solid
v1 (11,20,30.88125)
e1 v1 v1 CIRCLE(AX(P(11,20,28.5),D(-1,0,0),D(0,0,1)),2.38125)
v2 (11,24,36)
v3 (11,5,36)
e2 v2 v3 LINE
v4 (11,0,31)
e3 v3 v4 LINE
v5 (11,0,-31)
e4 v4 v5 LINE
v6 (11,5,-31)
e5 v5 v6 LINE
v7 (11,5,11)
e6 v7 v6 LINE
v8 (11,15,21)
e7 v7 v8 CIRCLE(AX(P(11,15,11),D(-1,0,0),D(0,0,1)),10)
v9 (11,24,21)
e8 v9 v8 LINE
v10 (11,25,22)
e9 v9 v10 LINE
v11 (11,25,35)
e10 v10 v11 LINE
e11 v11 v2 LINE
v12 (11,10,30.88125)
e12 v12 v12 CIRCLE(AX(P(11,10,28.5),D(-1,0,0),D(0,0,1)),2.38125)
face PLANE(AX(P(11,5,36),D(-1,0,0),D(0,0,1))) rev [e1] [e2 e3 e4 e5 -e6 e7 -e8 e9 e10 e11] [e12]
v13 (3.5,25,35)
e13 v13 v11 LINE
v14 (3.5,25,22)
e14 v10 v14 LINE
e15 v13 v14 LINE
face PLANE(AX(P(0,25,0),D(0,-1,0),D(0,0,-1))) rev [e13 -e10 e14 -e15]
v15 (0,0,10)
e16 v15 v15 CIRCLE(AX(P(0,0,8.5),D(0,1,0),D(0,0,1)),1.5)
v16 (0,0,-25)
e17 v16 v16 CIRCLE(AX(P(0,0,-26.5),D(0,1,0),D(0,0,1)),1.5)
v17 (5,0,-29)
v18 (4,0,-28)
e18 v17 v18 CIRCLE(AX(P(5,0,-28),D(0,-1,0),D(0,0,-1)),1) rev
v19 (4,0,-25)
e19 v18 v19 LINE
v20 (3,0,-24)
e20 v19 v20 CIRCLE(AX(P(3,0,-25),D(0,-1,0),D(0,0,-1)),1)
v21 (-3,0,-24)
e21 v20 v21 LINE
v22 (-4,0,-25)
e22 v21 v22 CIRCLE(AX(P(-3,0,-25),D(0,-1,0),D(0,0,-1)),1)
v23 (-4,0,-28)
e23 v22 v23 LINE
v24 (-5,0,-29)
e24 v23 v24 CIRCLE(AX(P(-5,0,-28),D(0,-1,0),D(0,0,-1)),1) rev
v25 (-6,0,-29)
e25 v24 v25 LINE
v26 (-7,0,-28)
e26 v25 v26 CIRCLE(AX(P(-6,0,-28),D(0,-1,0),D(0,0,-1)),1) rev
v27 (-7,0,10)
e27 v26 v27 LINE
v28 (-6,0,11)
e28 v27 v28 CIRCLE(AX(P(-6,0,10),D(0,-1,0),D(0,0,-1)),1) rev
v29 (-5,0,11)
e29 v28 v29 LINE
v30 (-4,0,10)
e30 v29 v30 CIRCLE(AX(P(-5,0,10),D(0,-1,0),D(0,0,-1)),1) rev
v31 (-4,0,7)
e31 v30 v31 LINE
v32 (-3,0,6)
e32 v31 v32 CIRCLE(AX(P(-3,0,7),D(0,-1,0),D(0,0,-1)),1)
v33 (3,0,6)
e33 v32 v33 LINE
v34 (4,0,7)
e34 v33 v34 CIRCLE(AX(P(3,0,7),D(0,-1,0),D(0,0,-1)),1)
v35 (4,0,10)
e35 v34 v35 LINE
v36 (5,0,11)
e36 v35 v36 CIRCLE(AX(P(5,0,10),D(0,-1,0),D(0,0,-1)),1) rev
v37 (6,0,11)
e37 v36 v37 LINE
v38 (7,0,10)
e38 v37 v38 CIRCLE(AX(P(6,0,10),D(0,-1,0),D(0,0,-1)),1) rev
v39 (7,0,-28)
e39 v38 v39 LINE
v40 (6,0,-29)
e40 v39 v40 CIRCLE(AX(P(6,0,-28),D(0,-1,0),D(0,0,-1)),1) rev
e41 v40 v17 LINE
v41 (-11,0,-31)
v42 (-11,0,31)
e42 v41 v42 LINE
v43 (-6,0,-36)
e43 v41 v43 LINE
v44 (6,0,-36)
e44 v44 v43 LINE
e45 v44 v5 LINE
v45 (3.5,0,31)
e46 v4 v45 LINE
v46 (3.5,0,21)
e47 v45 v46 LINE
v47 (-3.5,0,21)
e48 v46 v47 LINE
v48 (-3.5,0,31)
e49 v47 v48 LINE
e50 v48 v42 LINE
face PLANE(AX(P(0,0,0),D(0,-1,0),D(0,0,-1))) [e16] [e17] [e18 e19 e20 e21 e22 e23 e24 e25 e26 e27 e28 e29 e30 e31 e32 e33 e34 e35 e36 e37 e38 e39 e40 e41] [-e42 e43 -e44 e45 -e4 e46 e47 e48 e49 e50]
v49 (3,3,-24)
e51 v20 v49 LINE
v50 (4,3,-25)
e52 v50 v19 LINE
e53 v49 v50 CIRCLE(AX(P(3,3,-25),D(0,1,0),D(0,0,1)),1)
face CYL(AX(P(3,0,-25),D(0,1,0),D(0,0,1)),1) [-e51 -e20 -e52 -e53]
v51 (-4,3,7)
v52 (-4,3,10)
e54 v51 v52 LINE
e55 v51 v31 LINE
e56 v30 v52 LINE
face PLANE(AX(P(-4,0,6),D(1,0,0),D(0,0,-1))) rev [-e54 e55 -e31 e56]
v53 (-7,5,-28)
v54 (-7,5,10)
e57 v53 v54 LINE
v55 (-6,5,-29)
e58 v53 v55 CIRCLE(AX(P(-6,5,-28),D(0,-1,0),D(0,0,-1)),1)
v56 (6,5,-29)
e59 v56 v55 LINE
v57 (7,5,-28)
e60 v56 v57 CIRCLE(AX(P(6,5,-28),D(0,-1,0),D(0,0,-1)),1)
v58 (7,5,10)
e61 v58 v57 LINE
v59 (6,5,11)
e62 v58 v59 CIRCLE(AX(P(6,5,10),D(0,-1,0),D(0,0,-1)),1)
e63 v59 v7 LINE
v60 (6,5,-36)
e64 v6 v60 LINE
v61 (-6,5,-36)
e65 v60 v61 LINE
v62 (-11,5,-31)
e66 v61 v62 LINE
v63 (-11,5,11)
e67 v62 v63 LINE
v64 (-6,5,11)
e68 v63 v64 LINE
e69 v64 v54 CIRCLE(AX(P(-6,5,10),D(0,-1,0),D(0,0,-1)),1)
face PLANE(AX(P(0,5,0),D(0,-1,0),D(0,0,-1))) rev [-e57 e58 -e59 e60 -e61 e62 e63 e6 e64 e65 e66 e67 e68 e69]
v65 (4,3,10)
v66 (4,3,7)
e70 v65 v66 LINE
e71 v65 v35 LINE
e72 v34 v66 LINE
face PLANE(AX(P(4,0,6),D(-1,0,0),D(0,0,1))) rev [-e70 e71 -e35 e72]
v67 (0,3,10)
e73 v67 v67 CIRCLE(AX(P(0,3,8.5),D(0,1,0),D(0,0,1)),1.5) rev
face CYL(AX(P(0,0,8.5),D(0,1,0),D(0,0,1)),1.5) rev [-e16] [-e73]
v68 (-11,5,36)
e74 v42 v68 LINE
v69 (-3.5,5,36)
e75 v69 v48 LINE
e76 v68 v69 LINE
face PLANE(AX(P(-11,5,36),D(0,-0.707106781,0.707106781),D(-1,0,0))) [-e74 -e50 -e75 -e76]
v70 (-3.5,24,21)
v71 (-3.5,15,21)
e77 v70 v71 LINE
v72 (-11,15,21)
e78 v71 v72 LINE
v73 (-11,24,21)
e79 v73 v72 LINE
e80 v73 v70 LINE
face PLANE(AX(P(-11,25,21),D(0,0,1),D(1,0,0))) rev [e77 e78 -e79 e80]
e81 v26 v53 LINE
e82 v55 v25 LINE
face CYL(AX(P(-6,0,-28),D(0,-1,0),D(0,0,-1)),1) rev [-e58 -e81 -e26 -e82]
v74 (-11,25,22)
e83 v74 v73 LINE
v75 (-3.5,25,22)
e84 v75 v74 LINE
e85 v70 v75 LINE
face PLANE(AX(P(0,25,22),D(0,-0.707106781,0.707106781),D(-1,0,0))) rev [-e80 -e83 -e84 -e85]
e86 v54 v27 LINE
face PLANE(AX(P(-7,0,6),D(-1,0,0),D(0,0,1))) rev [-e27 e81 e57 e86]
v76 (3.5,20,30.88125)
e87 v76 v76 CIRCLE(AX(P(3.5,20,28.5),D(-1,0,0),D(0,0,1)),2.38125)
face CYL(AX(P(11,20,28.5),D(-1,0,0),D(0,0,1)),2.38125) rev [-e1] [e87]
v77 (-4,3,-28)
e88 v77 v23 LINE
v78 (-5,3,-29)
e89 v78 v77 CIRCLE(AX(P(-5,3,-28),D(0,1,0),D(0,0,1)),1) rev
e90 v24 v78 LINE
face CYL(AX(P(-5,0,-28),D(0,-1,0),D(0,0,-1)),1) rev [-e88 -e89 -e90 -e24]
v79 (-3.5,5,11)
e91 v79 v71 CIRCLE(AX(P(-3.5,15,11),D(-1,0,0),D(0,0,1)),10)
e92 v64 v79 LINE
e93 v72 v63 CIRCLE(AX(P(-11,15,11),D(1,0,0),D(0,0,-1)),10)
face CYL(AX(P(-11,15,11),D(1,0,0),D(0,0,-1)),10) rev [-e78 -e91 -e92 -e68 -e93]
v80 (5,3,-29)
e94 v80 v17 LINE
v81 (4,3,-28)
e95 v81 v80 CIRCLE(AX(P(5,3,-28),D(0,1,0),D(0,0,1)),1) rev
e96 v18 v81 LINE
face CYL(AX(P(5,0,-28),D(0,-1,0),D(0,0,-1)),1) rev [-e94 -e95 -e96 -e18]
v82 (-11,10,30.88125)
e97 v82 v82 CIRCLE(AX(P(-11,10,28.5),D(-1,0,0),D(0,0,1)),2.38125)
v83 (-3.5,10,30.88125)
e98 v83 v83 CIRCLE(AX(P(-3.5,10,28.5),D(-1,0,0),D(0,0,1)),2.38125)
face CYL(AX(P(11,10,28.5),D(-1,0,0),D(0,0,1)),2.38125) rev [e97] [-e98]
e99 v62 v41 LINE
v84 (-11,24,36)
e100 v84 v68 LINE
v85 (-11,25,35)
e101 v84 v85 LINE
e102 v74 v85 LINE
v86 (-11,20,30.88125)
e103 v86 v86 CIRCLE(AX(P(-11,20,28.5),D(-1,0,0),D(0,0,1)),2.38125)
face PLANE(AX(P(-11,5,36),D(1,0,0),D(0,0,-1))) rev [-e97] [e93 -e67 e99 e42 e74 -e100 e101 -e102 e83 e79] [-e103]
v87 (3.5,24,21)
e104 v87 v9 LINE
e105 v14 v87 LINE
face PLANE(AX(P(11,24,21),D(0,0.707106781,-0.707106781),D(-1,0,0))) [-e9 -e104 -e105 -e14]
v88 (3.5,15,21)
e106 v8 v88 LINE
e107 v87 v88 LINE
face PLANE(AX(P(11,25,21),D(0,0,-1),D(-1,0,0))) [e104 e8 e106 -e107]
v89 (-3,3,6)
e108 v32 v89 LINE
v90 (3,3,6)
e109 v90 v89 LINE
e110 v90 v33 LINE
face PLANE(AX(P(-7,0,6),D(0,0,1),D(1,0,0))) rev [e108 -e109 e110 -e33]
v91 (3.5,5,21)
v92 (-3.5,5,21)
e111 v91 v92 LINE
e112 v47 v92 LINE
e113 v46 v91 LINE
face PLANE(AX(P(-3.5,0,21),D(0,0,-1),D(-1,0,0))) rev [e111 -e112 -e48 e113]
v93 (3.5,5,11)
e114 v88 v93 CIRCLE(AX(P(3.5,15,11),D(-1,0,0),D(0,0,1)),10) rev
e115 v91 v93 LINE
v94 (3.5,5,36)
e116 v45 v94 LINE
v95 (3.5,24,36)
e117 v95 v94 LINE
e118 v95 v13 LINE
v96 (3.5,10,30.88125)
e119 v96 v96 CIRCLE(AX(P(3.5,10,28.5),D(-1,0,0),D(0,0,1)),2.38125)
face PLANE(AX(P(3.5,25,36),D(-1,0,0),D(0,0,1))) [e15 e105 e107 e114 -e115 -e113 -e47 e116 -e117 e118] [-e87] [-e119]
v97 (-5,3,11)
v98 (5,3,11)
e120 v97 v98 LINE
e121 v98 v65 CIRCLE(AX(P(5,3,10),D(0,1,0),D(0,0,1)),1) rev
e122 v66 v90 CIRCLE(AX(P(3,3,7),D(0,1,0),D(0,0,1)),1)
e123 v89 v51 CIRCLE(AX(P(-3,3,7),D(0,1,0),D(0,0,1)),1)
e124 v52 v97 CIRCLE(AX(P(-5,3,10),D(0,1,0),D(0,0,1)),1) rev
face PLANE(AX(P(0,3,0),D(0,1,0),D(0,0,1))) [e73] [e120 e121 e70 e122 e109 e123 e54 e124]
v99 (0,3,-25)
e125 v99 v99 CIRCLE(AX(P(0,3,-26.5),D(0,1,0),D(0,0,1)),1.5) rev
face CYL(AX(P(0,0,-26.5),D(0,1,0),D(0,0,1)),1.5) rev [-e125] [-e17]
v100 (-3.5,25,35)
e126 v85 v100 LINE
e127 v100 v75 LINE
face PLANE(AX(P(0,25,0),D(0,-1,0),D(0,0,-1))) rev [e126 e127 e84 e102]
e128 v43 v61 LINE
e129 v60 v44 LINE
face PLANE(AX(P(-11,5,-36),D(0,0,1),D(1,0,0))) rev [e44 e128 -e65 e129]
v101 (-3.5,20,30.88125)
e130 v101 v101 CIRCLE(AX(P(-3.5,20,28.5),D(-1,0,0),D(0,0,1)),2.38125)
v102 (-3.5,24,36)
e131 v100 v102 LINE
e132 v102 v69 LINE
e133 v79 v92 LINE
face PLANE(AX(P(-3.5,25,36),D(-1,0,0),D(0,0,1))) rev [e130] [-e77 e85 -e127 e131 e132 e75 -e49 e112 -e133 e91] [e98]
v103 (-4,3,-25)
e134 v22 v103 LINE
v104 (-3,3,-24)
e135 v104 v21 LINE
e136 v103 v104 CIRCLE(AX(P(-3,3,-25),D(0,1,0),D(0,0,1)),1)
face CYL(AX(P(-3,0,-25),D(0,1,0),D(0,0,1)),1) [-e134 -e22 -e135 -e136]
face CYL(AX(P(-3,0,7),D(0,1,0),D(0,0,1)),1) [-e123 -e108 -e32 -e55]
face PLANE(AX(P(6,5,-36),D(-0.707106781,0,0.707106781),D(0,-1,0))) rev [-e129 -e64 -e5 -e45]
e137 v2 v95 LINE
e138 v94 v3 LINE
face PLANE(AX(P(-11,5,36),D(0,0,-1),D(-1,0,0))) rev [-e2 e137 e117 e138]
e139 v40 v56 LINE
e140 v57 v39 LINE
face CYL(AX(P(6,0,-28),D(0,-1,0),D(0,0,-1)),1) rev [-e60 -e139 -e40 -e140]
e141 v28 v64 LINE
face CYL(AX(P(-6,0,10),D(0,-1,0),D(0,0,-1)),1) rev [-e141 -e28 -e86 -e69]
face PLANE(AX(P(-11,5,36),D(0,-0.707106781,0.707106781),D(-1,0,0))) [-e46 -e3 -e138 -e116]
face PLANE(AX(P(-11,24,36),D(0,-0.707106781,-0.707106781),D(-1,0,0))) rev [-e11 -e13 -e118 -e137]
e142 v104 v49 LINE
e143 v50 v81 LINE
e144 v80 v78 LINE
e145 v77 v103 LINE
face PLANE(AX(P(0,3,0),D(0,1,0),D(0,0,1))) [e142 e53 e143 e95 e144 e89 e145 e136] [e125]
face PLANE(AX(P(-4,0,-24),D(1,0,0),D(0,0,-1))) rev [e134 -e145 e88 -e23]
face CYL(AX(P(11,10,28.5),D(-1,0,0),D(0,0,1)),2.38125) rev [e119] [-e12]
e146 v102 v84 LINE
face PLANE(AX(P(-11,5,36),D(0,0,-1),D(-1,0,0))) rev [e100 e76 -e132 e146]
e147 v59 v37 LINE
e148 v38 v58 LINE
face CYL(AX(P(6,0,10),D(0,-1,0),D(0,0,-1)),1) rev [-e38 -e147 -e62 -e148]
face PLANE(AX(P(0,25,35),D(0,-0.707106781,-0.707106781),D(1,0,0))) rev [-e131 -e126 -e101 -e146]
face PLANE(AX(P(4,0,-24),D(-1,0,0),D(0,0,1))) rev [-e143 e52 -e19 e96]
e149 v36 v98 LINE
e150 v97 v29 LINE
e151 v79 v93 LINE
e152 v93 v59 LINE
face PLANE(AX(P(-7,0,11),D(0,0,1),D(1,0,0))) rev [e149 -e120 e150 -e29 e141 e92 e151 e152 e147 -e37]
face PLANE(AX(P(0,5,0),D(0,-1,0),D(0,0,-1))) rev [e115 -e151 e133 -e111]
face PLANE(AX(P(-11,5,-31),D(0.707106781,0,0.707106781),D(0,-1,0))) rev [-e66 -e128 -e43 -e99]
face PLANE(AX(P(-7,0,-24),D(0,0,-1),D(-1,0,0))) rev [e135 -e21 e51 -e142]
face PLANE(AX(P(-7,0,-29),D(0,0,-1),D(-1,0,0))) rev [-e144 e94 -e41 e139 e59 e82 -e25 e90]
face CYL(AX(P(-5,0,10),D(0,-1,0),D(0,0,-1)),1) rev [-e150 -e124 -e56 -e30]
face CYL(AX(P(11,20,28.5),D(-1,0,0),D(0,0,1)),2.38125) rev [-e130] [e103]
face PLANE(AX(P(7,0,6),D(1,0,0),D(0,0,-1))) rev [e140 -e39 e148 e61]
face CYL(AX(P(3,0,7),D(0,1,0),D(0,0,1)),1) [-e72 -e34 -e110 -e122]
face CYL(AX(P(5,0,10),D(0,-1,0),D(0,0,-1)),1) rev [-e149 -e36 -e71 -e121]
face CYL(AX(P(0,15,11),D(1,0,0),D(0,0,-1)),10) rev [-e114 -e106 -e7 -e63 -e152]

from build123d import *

# Parameters (mm, degrees)
SKETCH1_W           = 22
SKETCH1_H           = 72
BOSS_EXTRUDE2_DEPTH = 5
SKETCH2_W           = 14
SKETCH2_H           = 30
CUT_EXTRUDE1_DEPTH  = 38.973675092
SKETCH3_W           = 3
SKETCH3_H           = 5
CUT_EXTRUDE2_DEPTH  = 38.973675092
SKETCH4_R           = 1.5
CUT_EXTRUDE3_DEPTH  = 38.973675092
SKETCH5_W           = 7.5
SKETCH5_H           = 15
BOSS_EXTRUDE3_DEPTH = 20
CHAMFER2_SIZE       = 5
SKETCH6_W           = 7
SKETCH6_H           = 15
CUT_EXTRUDE4_DEPTH  = 43.626282972
SKETCH7_W           = 8
SKETCH7_H           = 5
CUT_EXTRUDE5_DEPTH  = 2
CHAMFER6_SIZE       = 5
FILLET3_R           = 1
FILLET6_R           = 10
SKETCH9_R           = 2.38125
CUT_EXTRUDE6_DEPTH  = 50.040799341
CHAMFER8_SIZE       = 1


with BuildPart() as part:
    # Sketch1 → Boss-Extrude2 (new body)
    with BuildSketch(Plane(origin=(0, 0, 0), x_dir=(1, 0, 0), z_dir=(0, 1, 0))):
        Rectangle(SKETCH1_W, SKETCH1_H)
    extrude(amount=BOSS_EXTRUDE2_DEPTH)

    # Sketch2 → Cut-Extrude1 (cut, through all)
    with BuildSketch(Plane(origin=(0, 5, 0), x_dir=(1, 0, 0), z_dir=(0, 1, 0))):
        with Locations((0, 9)):
            Rectangle(SKETCH2_W, SKETCH2_H)
    extrude(amount=-CUT_EXTRUDE1_DEPTH, mode=Mode.SUBTRACT)

    # Sketch3 → Cut-Extrude2 (cut, through all)
    with BuildSketch(Plane(origin=(0, 5, 0), x_dir=(1, 0, 0), z_dir=(0, 1, 0))):
        with Locations((-5.5, 26.5)):
            Rectangle(SKETCH3_W, SKETCH3_H)
        with Locations((5.5, 26.5)):
            Rectangle(SKETCH3_W, SKETCH3_H)
        with Locations((-5.5, -8.5)):
            Rectangle(SKETCH3_W, SKETCH3_H)
        with Locations((5.5, -8.5)):
            Rectangle(SKETCH3_W, SKETCH3_H)
    extrude(amount=-CUT_EXTRUDE2_DEPTH, mode=Mode.SUBTRACT)

    # Sketch4 → Cut-Extrude3 (cut, through all)
    with BuildSketch(Plane(origin=(0, 5, 0), x_dir=(1, 0, 0), z_dir=(0, 1, 0))):
        with Locations(Location((0, 26.5, 0), (0, 0, 270))):
            Circle(SKETCH4_R)
        with Locations(Location((0, -8.5, 0), (0, 0, 270))):
            Circle(SKETCH4_R)
    extrude(amount=-CUT_EXTRUDE3_DEPTH, mode=Mode.SUBTRACT)

    # Sketch5 → Boss-Extrude3 (add)
    with BuildSketch(Plane(origin=(0, 5, 0), x_dir=(1, 0, 0), z_dir=(0, 1, 0))):
        with Locations((-7.25, -28.5)):
            Rectangle(SKETCH5_W, SKETCH5_H)
    boss_extrude3 = extrude(amount=BOSS_EXTRUDE3_DEPTH)

    # Mirror1: Boss-Extrude3 across plane
    add(boss_extrude3.mirror(Plane(origin=(0, 0, 0), x_dir=(0, 0, 1), z_dir=(1, 0, 0))))

    # Chamfer2
    chamfer2_edges = [part.edges().sort_by_distance(p)[0] for p in [
        (0, 0, 36),
    ]]
    chamfer(chamfer2_edges, length=CHAMFER2_SIZE - 0.0001)  # a hair under: the kernel refuses the full size

    # Sketch6 → Cut-Extrude4 (cut, through all)
    with BuildSketch(Plane(origin=(0, 5, 0), x_dir=(1, 0, 0), z_dir=(0, 1, 0))):
        with Locations((0, -28.5)):
            Rectangle(SKETCH6_W, SKETCH6_H)
    extrude(amount=-CUT_EXTRUDE4_DEPTH, mode=Mode.SUBTRACT)

    # Sketch7 → Cut-Extrude5 (cut)
    with BuildSketch(Plane(origin=(0, 5, 0), x_dir=(1, 0, 0), z_dir=(0, 1, 0))):
        with Locations((0, 26.5)):
            Rectangle(SKETCH7_W, SKETCH7_H)
        with Locations((0, -8.5)):
            Rectangle(SKETCH7_W, SKETCH7_H)
    extrude(amount=-CUT_EXTRUDE5_DEPTH, mode=Mode.SUBTRACT)

    # Chamfer6
    chamfer6_edges = [part.edges().sort_by_distance(p)[0] for p in [
        (-11, 2.5, -36),
        (11, 2.5, -36),
    ]]
    chamfer(chamfer6_edges, length=CHAMFER6_SIZE)

    # Fillet3
    fillet3_edges = [part.edges().sort_by_distance(p)[0] for p in [
        (-7, 2.5, -29),
        (-4, 1.5, -29),
        (-4, 1.5, -24),
        (7, 2.5, -29),
        (4, 1.5, -24),
        (4, 1.5, -29),
        (-7, 2.5, 11),
        (-4, 1.5, 6),
        (-4, 1.5, 11),
        (7, 2.5, 11),
        (4, 1.5, 11),
        (4, 1.5, 6),
    ]]
    fillet(fillet3_edges, radius=FILLET3_R)

    # Fillet6
    fillet6_edges = [part.edges().sort_by_distance(p)[0] for p in [
        (-7.25, 5, 21),
        (7.25, 5, 21),
    ]]
    fillet(fillet6_edges, radius=FILLET6_R - 0.0001)  # a hair under: the kernel refuses the full size

    # Sketch9 → Cut-Extrude6 (cut, through all)
    with BuildSketch(Plane.ZY.offset(11)):
        with Locations((28.5, 20)):
            Circle(SKETCH9_R)
        with Locations((28.5, 10)):
            Circle(SKETCH9_R)
    extrude(amount=-CUT_EXTRUDE6_DEPTH, mode=Mode.SUBTRACT)

    # Chamfer8
    chamfer8_edges = [part.edges().sort_by_distance(p)[0] for p in [
        (-7.25, 25, 36),
        (-7.25, 25, 21),
        (7.25, 25, 21),
        (7.25, 25, 36),
    ]]
    chamfer(chamfer8_edges, length=CHAMFER8_SIZE)


solid = part.part
